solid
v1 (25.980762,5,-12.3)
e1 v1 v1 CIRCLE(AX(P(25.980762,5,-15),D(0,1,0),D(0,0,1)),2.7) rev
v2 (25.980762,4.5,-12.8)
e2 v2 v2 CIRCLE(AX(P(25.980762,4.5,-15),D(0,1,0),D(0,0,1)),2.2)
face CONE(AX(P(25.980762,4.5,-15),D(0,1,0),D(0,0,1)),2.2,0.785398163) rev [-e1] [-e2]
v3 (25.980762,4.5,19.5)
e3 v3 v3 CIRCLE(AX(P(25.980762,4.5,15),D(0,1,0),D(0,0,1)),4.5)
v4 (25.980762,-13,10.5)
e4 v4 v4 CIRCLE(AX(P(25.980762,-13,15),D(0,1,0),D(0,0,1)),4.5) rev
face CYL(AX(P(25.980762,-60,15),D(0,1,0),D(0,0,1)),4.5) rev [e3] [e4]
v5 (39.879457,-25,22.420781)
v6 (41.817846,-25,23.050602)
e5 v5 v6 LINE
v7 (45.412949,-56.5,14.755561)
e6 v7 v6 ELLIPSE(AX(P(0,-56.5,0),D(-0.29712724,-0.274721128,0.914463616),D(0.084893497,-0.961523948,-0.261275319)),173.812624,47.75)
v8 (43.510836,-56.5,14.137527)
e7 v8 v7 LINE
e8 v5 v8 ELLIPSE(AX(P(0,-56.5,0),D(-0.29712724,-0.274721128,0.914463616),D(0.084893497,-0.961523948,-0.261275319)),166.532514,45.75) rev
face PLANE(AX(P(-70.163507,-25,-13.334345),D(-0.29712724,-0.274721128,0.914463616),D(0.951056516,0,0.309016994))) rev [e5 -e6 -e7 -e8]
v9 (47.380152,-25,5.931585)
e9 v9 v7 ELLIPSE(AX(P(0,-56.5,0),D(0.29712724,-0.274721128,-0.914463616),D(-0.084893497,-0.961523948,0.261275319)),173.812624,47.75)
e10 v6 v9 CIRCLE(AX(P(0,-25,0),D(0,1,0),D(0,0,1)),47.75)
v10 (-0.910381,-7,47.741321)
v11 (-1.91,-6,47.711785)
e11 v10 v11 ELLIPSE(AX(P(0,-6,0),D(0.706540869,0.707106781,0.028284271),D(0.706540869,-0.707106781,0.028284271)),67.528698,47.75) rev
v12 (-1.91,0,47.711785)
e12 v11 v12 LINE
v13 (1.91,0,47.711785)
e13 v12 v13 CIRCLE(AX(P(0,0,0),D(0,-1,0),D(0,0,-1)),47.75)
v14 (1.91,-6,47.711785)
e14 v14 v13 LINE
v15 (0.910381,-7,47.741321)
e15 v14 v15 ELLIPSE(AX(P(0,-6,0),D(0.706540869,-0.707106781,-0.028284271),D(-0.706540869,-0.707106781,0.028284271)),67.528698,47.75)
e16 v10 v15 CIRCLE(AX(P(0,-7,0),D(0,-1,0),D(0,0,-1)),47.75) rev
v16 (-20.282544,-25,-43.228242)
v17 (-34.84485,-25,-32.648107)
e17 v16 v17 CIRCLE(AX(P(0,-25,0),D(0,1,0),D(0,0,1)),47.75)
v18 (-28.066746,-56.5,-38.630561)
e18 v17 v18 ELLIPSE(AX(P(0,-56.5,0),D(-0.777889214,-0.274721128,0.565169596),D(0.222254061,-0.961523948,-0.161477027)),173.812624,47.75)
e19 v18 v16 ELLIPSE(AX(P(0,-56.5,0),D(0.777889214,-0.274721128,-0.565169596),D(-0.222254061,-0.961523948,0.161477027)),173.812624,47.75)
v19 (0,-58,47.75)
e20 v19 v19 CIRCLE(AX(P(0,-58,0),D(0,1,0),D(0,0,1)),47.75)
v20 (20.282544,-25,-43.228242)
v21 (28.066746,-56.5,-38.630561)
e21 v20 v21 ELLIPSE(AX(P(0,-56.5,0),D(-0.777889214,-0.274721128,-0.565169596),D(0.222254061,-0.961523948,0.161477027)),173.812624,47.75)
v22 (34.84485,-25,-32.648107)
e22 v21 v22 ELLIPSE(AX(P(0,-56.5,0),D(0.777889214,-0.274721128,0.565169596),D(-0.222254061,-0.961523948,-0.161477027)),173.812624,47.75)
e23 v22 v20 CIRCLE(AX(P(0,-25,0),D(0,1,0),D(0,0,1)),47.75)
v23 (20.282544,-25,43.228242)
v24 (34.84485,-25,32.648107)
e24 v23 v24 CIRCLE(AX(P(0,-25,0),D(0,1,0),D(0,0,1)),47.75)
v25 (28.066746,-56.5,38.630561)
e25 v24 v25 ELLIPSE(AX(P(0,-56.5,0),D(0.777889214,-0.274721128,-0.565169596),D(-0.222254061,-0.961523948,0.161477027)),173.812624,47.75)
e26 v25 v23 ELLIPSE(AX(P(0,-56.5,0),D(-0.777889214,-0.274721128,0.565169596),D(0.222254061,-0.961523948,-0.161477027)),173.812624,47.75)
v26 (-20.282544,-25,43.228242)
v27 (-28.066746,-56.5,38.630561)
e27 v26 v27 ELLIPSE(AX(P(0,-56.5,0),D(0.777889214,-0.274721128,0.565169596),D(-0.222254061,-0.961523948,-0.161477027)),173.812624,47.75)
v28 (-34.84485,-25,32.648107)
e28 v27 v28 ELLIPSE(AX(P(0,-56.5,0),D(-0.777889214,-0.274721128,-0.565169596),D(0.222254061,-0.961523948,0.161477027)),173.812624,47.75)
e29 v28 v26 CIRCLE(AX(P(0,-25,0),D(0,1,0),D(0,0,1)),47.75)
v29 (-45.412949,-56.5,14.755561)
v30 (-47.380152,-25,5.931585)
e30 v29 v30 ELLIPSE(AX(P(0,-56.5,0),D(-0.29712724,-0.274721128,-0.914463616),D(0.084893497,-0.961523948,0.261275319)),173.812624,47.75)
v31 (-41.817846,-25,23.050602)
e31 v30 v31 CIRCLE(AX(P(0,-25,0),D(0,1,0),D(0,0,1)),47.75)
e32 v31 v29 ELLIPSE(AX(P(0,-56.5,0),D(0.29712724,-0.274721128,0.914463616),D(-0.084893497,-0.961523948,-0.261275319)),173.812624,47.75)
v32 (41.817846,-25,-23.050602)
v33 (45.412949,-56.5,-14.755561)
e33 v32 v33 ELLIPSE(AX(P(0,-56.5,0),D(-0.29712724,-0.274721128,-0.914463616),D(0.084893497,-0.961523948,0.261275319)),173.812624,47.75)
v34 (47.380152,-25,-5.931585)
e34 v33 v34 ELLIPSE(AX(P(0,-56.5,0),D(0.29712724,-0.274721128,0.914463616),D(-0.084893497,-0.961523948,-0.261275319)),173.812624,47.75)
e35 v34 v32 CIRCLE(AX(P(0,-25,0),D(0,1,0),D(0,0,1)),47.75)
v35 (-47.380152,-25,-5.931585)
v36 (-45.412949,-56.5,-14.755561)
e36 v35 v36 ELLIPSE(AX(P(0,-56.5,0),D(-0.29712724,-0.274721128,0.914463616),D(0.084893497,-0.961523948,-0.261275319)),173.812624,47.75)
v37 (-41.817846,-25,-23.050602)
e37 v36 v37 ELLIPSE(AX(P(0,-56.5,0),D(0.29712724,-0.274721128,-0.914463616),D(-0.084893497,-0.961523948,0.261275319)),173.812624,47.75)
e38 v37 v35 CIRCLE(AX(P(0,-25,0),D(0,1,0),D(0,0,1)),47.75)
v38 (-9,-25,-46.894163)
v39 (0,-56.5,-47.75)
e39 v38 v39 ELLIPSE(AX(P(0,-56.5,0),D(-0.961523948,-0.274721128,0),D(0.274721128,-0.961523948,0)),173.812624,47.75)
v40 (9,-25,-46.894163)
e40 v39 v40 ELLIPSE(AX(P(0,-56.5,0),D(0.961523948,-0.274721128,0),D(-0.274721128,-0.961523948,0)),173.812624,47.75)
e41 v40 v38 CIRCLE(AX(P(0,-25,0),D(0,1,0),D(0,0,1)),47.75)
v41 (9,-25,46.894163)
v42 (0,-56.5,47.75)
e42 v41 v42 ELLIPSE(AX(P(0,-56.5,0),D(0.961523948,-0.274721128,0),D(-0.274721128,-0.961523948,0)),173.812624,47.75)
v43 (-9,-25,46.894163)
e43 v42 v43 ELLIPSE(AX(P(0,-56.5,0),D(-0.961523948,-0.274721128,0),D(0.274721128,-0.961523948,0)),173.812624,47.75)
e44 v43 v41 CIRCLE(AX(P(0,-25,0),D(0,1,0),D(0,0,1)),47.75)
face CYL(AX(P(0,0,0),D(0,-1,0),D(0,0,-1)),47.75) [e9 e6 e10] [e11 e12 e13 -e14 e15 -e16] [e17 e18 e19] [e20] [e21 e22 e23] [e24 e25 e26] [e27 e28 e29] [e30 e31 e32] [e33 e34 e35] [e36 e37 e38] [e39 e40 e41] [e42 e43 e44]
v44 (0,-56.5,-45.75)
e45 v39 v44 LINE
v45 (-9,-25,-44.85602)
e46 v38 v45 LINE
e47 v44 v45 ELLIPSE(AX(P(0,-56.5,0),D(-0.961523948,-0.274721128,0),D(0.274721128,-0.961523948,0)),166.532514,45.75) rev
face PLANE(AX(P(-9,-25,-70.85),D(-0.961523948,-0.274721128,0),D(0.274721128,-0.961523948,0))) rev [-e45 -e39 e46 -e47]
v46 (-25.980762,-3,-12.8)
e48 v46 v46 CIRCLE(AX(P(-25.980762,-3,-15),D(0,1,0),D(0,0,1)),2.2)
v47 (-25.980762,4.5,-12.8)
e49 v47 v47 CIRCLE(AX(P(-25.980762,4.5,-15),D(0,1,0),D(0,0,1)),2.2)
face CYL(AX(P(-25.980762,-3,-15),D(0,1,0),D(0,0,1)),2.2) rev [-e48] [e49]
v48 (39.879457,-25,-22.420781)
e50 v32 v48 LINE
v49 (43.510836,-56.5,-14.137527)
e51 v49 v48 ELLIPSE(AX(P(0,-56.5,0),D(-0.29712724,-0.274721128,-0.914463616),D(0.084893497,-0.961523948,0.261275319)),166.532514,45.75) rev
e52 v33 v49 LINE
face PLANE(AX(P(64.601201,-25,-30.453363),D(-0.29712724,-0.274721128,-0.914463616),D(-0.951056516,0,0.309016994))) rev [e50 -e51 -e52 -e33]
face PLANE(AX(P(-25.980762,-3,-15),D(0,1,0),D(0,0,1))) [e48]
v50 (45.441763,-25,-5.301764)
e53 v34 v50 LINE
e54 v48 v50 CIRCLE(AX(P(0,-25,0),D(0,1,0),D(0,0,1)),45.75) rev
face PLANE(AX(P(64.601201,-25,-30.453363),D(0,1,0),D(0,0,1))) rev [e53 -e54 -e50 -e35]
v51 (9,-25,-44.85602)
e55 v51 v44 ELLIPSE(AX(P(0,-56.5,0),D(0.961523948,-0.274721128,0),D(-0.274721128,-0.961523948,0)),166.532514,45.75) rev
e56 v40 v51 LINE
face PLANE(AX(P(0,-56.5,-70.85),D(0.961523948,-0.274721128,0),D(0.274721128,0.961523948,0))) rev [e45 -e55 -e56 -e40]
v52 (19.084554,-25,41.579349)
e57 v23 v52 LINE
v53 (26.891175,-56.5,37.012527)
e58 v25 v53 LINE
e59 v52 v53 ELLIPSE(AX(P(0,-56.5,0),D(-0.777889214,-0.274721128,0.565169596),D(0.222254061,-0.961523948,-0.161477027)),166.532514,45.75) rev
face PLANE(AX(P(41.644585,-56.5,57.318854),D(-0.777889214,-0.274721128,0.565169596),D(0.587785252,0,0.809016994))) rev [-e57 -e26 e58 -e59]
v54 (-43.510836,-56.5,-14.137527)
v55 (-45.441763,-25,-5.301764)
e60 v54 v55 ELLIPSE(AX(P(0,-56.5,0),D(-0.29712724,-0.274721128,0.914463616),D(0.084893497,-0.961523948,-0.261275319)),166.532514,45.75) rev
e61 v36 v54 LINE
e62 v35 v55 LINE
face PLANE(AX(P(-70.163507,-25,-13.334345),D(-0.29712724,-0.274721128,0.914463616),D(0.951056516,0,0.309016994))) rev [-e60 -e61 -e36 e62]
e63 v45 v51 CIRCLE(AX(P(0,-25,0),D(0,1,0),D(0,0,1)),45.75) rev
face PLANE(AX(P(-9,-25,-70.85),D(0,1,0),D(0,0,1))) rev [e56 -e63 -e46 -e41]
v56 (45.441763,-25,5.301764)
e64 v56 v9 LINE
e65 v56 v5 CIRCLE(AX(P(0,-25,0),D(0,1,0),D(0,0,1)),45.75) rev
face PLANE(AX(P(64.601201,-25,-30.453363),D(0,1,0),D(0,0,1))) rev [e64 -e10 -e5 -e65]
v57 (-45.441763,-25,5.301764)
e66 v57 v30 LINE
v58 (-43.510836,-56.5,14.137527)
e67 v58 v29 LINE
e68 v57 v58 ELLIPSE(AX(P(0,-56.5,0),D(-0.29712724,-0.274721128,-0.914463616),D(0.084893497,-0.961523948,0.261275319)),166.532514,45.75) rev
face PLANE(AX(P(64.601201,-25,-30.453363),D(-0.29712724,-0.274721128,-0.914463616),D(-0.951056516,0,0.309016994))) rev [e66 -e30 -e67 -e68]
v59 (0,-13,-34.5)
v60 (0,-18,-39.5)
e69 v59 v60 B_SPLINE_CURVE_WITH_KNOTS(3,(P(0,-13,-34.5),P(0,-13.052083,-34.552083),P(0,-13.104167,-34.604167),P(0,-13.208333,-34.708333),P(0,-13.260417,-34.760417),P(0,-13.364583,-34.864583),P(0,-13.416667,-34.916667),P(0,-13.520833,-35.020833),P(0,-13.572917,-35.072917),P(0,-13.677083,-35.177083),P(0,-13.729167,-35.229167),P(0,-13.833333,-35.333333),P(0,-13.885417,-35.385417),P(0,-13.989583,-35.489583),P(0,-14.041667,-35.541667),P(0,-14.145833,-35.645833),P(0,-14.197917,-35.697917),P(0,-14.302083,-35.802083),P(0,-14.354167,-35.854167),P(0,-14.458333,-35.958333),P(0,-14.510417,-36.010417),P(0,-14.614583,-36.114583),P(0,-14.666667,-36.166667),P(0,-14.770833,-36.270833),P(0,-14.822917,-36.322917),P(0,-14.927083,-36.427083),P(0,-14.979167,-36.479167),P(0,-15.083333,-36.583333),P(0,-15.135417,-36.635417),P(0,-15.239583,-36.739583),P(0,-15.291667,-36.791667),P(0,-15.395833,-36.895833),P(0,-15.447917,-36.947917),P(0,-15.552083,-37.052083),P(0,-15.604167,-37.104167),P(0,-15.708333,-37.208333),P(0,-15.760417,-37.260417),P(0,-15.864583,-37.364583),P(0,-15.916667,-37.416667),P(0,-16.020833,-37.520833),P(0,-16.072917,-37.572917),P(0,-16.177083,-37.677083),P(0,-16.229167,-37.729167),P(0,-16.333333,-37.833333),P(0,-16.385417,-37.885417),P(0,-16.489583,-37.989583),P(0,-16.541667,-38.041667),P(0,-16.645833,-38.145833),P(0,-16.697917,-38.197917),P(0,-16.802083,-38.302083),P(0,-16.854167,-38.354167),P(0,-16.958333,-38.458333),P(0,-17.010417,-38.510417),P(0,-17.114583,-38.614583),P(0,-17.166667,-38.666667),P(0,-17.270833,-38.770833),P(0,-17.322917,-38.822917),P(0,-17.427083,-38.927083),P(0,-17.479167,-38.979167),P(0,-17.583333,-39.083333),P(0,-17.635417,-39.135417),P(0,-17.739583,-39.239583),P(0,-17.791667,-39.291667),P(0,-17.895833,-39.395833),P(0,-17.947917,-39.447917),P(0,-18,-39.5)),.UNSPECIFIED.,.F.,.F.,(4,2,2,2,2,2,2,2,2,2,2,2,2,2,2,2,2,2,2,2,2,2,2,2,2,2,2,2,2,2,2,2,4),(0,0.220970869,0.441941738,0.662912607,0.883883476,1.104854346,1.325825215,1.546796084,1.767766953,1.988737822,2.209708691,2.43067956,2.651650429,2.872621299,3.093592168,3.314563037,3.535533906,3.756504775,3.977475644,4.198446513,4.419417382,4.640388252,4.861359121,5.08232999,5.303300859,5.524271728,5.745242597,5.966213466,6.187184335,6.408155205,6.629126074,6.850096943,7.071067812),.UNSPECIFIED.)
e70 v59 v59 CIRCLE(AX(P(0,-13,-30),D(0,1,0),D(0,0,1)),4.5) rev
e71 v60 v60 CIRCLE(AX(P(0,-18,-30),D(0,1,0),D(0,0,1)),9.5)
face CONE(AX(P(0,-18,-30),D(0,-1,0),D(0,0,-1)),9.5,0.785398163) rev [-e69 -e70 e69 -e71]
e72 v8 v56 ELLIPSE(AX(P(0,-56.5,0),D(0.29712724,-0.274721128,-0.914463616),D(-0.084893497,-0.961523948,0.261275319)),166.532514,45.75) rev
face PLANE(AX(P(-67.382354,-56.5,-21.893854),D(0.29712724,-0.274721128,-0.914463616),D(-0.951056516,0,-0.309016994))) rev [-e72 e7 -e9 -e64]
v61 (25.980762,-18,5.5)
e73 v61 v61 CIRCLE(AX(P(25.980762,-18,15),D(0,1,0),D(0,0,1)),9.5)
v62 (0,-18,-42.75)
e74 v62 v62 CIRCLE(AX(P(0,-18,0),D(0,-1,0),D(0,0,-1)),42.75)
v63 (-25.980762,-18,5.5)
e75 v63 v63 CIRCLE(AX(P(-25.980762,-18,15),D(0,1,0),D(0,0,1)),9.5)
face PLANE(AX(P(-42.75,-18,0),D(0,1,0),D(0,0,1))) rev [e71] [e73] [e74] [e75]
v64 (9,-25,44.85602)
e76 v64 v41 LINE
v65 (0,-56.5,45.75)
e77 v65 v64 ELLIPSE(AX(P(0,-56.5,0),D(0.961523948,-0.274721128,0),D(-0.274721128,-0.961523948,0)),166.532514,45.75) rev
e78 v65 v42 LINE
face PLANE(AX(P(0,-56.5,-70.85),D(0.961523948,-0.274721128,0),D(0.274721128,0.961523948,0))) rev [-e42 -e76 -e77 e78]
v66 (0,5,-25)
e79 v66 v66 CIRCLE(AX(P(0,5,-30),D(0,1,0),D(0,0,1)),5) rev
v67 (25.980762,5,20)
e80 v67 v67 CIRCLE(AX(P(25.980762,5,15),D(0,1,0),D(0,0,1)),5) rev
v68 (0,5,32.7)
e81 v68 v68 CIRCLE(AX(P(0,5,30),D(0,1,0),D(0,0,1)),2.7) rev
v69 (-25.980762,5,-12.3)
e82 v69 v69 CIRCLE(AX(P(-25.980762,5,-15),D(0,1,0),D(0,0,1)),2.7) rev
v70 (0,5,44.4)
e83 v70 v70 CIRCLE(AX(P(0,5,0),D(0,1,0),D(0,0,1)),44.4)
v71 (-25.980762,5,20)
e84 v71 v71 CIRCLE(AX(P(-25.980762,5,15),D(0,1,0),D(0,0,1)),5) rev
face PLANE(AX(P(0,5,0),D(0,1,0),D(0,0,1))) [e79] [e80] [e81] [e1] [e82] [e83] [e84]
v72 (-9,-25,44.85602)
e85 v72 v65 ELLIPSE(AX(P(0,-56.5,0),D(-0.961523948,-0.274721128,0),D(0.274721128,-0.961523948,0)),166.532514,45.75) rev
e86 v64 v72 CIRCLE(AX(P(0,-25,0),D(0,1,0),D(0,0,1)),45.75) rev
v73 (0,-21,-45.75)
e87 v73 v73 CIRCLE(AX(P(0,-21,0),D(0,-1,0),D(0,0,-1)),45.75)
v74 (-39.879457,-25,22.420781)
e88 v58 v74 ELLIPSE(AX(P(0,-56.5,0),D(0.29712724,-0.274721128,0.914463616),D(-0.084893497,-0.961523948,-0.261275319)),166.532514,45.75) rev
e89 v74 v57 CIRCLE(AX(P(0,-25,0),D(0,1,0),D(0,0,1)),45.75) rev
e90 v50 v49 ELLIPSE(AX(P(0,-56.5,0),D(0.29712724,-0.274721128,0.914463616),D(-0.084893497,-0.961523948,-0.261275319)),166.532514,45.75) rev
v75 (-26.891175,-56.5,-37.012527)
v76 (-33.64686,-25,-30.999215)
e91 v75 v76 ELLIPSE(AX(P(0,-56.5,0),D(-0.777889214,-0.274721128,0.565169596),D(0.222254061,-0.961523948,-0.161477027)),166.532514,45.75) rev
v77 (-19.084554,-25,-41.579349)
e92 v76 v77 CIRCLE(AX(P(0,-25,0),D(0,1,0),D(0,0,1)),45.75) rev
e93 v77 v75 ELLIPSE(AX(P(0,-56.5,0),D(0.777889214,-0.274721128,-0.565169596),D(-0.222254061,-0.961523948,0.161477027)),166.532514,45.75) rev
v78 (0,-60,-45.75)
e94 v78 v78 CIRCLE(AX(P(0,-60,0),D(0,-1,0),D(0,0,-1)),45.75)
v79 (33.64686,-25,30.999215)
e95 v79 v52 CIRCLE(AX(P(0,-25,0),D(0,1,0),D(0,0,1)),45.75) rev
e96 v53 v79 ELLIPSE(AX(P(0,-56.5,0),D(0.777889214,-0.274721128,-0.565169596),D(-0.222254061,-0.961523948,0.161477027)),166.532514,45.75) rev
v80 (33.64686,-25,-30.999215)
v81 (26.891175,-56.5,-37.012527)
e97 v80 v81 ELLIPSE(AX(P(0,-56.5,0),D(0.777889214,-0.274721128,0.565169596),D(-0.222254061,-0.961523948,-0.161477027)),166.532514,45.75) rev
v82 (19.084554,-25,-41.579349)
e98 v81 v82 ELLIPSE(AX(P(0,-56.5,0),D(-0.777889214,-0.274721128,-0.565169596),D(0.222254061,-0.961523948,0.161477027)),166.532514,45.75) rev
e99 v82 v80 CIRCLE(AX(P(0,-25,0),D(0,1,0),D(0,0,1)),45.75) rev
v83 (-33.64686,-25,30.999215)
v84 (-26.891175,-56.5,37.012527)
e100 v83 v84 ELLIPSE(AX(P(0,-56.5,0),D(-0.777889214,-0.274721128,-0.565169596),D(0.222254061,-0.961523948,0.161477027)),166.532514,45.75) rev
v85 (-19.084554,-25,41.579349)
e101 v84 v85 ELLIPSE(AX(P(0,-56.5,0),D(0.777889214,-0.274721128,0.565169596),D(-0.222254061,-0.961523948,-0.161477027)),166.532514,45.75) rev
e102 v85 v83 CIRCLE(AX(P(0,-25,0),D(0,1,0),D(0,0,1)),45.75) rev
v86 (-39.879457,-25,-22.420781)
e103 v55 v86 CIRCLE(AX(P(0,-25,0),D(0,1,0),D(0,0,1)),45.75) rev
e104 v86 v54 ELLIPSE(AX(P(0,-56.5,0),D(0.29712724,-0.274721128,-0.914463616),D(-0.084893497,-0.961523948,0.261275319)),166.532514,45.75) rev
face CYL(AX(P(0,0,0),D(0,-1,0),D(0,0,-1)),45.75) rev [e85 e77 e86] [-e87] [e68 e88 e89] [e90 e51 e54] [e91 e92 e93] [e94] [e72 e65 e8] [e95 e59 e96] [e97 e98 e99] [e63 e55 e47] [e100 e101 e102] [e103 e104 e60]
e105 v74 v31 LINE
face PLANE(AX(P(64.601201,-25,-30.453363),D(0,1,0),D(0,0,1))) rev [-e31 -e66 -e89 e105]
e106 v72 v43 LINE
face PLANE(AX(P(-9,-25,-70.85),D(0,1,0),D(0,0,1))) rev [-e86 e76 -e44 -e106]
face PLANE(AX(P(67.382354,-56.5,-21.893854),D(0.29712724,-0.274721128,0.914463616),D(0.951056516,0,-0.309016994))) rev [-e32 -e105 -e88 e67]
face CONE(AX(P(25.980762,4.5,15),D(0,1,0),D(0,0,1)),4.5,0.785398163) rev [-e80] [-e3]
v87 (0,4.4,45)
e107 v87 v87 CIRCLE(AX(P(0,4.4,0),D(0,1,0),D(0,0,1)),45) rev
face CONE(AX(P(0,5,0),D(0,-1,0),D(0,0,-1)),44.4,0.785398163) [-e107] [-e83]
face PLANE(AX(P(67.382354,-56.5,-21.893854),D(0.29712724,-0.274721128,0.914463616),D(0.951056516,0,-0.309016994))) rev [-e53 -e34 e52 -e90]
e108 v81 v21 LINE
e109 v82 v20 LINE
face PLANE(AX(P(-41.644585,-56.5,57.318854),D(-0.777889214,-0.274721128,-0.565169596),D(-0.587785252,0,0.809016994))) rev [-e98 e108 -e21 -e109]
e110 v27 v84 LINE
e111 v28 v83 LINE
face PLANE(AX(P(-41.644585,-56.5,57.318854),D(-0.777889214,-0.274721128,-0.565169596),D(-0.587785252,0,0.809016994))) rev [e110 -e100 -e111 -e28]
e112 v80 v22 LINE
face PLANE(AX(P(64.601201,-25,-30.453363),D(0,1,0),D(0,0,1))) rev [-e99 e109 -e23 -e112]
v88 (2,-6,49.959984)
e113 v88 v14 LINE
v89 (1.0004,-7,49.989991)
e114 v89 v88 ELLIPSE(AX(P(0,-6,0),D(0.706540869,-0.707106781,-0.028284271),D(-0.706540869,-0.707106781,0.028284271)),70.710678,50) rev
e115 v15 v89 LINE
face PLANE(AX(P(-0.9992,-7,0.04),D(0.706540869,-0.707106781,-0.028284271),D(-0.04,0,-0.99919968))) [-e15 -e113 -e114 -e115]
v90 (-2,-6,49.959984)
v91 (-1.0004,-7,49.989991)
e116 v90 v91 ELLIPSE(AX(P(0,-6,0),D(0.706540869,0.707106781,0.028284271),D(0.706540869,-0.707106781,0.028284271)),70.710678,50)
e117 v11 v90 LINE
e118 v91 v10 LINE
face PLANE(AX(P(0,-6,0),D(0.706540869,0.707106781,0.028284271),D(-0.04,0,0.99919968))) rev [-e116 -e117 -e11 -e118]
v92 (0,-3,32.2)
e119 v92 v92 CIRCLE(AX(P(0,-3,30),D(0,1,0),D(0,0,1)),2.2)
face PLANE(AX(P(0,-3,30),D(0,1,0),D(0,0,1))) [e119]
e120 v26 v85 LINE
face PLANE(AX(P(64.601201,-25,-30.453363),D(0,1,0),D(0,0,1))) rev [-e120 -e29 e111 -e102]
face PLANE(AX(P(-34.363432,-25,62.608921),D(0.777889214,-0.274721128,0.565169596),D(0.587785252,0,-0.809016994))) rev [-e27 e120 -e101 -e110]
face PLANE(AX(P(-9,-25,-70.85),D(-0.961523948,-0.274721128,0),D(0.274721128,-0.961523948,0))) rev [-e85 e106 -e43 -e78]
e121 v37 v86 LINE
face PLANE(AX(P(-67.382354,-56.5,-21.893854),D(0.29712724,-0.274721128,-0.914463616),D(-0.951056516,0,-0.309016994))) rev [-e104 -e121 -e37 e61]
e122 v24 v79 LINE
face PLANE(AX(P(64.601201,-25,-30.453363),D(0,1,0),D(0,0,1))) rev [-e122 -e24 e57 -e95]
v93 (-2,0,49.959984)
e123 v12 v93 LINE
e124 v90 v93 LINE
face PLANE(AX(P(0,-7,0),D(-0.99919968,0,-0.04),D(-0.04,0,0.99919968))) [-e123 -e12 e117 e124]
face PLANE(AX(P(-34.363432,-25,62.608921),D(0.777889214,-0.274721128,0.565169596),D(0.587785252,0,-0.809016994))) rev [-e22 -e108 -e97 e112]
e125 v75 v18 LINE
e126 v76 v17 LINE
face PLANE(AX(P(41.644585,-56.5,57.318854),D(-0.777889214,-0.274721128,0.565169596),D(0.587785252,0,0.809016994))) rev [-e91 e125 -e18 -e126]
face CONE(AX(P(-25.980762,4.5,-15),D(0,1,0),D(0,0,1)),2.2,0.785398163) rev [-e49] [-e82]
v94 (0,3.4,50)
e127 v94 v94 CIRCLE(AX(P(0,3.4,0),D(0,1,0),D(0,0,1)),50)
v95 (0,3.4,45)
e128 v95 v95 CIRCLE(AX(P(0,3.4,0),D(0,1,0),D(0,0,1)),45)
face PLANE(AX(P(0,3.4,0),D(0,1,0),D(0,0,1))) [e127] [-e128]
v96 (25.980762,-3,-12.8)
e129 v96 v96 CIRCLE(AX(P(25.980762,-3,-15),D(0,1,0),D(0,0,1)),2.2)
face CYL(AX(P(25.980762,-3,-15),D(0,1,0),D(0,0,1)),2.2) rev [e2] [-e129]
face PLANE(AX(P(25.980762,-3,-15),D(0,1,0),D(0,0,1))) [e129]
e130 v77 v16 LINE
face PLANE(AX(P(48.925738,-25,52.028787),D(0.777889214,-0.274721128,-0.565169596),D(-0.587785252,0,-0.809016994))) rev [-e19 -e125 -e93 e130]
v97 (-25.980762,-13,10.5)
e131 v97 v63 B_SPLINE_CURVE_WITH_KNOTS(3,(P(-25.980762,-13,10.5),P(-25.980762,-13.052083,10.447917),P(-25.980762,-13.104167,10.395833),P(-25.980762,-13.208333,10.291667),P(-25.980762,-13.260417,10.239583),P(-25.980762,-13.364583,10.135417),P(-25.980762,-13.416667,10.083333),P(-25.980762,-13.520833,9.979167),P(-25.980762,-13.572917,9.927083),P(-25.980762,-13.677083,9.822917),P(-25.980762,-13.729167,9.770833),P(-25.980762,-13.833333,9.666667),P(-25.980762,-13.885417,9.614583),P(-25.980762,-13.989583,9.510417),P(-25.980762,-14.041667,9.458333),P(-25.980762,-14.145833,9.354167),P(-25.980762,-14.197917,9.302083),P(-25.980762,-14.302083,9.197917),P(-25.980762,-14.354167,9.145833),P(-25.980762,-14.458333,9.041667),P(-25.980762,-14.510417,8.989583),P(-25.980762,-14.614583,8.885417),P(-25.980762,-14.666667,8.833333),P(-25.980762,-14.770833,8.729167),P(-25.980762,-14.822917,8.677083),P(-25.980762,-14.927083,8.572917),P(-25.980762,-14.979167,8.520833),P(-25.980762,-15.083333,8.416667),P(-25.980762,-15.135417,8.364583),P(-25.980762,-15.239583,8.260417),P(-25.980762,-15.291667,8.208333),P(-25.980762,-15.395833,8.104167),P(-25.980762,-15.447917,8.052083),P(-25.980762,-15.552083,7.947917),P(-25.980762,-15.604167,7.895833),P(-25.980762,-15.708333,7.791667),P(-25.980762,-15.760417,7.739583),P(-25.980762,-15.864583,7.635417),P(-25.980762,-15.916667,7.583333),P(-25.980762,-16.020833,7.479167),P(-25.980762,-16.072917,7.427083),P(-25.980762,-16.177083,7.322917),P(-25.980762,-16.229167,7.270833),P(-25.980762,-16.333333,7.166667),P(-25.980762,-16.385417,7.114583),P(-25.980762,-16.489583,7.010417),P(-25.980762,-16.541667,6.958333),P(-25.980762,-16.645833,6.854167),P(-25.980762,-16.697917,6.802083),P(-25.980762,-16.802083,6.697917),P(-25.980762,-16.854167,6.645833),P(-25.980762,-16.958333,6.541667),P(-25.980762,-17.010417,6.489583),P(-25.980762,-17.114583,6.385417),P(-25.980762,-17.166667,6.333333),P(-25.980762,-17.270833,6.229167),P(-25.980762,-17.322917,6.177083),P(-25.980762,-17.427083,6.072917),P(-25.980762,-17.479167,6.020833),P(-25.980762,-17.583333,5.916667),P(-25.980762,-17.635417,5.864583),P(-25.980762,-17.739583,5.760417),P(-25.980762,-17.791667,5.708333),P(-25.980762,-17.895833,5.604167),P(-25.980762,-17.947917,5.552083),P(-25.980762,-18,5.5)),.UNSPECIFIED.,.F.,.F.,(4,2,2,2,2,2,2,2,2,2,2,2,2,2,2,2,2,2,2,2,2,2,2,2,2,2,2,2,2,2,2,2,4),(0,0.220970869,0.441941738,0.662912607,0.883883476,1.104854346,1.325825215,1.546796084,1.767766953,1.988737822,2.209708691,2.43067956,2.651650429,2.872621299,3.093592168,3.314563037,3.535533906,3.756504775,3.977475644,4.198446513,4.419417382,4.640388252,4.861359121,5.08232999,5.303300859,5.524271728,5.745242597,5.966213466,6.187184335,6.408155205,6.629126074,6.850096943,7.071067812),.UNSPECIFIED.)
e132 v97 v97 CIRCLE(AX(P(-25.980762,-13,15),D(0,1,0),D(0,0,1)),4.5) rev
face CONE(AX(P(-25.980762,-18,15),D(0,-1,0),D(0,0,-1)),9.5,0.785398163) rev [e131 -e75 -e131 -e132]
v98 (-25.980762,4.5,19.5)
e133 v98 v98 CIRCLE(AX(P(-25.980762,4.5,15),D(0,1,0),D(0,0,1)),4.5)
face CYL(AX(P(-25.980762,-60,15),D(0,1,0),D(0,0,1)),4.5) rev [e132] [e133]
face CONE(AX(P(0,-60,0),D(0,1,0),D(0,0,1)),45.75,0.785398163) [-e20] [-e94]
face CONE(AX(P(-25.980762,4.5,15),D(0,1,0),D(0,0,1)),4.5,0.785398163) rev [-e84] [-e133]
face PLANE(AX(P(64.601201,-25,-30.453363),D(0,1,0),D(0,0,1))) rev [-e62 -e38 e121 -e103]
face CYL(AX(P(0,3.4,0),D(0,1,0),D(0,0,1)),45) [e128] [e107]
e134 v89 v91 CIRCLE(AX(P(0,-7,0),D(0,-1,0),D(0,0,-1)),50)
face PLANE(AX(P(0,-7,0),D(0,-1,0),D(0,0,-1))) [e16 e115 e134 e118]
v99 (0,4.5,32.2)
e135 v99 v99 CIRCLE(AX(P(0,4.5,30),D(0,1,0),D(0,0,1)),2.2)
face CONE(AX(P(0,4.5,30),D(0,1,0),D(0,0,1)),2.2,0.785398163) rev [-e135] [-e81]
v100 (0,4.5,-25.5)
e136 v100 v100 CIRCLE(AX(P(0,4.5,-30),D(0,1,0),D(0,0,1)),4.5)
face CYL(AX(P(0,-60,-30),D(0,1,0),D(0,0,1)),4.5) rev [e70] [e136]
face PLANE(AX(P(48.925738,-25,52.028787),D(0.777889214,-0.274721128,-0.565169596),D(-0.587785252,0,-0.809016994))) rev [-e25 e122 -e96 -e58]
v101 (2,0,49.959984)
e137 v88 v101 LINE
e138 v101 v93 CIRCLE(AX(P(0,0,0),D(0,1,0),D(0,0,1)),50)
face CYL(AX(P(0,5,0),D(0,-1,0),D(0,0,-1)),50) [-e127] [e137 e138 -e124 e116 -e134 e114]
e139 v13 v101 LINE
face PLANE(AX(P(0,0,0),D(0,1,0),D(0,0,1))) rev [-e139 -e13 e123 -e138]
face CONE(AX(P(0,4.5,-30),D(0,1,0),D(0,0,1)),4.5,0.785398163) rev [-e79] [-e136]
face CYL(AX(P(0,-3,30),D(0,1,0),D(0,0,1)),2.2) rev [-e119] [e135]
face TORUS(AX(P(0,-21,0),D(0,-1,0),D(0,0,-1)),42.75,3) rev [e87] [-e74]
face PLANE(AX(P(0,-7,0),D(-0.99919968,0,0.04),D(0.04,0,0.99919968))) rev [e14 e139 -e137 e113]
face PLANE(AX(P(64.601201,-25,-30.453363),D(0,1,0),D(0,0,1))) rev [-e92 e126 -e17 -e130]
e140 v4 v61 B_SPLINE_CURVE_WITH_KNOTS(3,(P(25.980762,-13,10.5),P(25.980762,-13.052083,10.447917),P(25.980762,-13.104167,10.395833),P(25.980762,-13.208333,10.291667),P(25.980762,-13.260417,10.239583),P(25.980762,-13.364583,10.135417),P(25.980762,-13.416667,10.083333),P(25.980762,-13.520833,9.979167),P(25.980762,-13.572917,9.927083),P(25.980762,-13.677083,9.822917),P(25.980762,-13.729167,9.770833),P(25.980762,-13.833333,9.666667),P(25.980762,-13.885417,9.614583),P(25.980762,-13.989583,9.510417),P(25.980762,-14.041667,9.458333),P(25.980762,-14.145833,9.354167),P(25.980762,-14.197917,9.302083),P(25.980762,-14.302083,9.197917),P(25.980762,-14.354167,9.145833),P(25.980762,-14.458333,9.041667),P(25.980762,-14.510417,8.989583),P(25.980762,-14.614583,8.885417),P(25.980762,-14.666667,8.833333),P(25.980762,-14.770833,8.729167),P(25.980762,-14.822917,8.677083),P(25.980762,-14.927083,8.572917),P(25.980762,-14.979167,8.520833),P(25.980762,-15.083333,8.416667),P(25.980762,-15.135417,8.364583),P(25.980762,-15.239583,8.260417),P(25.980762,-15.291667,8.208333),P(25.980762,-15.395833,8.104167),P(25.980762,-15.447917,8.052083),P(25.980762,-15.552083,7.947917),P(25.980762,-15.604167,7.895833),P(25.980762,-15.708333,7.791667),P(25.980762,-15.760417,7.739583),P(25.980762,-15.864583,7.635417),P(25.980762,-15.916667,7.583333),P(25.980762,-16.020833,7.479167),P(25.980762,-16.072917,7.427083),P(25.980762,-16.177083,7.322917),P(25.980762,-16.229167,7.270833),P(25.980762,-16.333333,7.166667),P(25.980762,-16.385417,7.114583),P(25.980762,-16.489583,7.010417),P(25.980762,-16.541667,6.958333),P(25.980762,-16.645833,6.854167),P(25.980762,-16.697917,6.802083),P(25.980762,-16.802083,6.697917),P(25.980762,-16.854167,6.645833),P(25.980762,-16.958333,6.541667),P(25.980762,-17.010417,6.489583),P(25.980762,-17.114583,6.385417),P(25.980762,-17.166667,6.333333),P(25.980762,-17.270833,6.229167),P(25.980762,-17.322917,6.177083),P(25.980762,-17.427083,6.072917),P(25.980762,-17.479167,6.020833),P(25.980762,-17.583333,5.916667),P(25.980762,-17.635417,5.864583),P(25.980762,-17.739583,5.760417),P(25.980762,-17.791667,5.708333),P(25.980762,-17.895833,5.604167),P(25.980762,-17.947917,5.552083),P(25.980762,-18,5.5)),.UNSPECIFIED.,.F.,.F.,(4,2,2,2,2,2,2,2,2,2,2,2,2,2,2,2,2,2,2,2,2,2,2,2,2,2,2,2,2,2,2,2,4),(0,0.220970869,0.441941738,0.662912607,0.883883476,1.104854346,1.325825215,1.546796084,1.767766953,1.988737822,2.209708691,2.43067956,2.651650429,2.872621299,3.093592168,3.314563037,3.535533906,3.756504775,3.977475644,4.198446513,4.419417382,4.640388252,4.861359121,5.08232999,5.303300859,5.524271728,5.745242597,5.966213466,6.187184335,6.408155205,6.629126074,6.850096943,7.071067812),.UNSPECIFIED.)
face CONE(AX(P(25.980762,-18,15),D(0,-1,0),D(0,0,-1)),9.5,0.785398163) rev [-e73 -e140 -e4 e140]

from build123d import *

# Parameters (mm, degrees)
CUT_EXTRUDE_651_DEPTH      = 70.85
PATTERN_CIRCULAR_705_COUNT = 5
SKETCH_7_R                 = 50
EXTRUDE_1_DEPTH            = 5
CUT_EXTRUDE_START          = -1.6
SKETCH_8_R                 = 50
SKETCH_8_R_2               = 45
CUT_EXTRUDE_1_DEPTH        = 1.6
SKETCH_10_R                = 4.5
CUT_EXTRUDE_4_DEPTH        = 97.046863561
SKETCH_10_4_R              = 2.2
CUT_EXTRUDE_5_DEPTH        = 8
CHAMFER_1_SIZE             = 0.5
EXTRUDE_START              = 7
EXTRUDE_2_DEPTH            = 7
CHAMFER_4_SIZE             = 1
CHAMFER_5_SIZE             = 2
CHAMFER_6_SIZE             = 5
CHAMFER_7_SIZE             = 0.6


with BuildPart() as part:
    # Эскиз2 → Revolve 379 (revolve)
    with BuildSketch(Plane.XY, mode=Mode.PRIVATE) as revolve_379_sk:
        with BuildLine():
            Line((0, 0), (-47.75, 0))
            Line((-47.75, 0), (-47.75, -60))
            Line((-47.75, -60), (-45.75, -60))
            Line((-45.75, -60), (-45.75, -21))
            ThreePointArc((-45.75, -21), (-44.871320344, -18.878679656), (-42.75, -18))
            Line((-42.75, -18), (0, -18))
            Line((0, -18), (0, 0))
        make_face()
    revolve(revolve_379_sk.sketch.rotate(Axis((0, 0, 0), (0, 1, 0)), 270), axis=Axis((0, 0, 0), (0, 1, 0)))

    # Эскиз4 → Cut-Extrude 651 (cut, symmetric)
    with BuildSketch(Plane.XY):
        Polygon((-9, -25), (9, -25), (0, -56.5), align=None)
    cut_extrude_651 = extrude(amount=CUT_EXTRUDE_651_DEPTH, both=True, mode=Mode.SUBTRACT)

    # Pattern Circular 705: Cut-Extrude 651 ×5 about axis
    pattern_circular_705_axis = Axis((0, 0, 0), (0, 1, 0))
    for i in range(1, PATTERN_CIRCULAR_705_COUNT):
        add(cut_extrude_651.rotate(pattern_circular_705_axis, i * 360 / PATTERN_CIRCULAR_705_COUNT), mode=Mode.SUBTRACT)

    # Эскиз7 → Бобышка-Вытянуть1 (add)
    with BuildSketch(Plane(origin=(0, 0, 0), x_dir=(1, 0, 0), z_dir=(0, 1, 0))):
        with Locations(Location((0, 0, 0), (0, 0, 270))):
            Circle(SKETCH_7_R)
    extrude(amount=EXTRUDE_1_DEPTH)

    # Эскиз8 → Вырез-Вытянуть1 (cut)
    with BuildSketch(Plane(origin=(0, 5, 0), x_dir=(1, 0, 0), z_dir=(0, 1, 0)).offset(CUT_EXTRUDE_START)):
        with Locations(Location((0, 0, 0), (0, 0, 270))):
            Circle(SKETCH_8_R)
        with Locations(Location((0, 0, 0), (0, 0, 270))):
            Circle(SKETCH_8_R_2, mode=Mode.SUBTRACT)
    extrude(amount=CUT_EXTRUDE_1_DEPTH, mode=Mode.SUBTRACT)

    # Эскиз10 → Вырез-Вытянуть4 (cut, through all)
    with BuildSketch(Plane(origin=(0, 5, 0), x_dir=(1, 0, 0), z_dir=(0, 1, 0))):
        with Locations(Location((0, 30, 0), (0, 0, 270))):
            Circle(SKETCH_10_R)
        with Locations(Location((25.980762114, -15, 0), (0, 0, 270))):
            Circle(SKETCH_10_R)
        with Locations(Location((-25.980762114, -15, 0), (0, 0, 270))):
            Circle(SKETCH_10_R)
    extrude(amount=-CUT_EXTRUDE_4_DEPTH, mode=Mode.SUBTRACT)

    # Эскиз10<4> → Вырез-Вытянуть5 (cut)
    with BuildSketch(Plane(origin=(0, 5, 0), x_dir=(1, 0, 0), z_dir=(0, 1, 0))):
        with Locations(Location((0, -30, 0), (0, 0, 270))):
            Circle(SKETCH_10_4_R)
        with Locations(Location((-25.980762114, 15, 0), (0, 0, 270))):
            Circle(SKETCH_10_4_R)
        with Locations(Location((25.980762114, 15, 0), (0, 0, 270))):
            Circle(SKETCH_10_4_R)
    extrude(amount=-CUT_EXTRUDE_5_DEPTH, mode=Mode.SUBTRACT)

    # Фаска1
    chamfer_1_edges = [part.edges().sort_by_distance(p)[0] for p in [
        (0, 5, -34.5),
        (-25.980762114, 5, 10.5),
        (25.980762114, 5, 10.5),
        (-25.980762114, 5, -17.2),
        (25.980762114, 5, -17.2),
        (0, 5, 27.8),
    ]]
    chamfer(chamfer_1_edges, length=CHAMFER_1_SIZE)

    # Эскиз13 → Бобышка-Вытянуть2 (add)
    with BuildSketch(Plane.XZ.offset(EXTRUDE_START)):
        with BuildLine():
            ThreePointArc((-1.91, 47.711784708), (0, 47.75), (1.91, 47.711784708))
            Line((1.91, 47.711784708), (2, 49.959983987))
            ThreePointArc((2, 49.959983987), (0, 50), (-2, 49.959983987))
            Line((-2, 49.959983987), (-1.91, 47.711784708))
        make_face()
    extrude(amount=-EXTRUDE_2_DEPTH)

    # Фаска4
    chamfer_4_edges = [part.edges().sort_by_distance(p)[0] for p in [
        (-1.955, -7, 48.835884347),
        (1.955, -7, 48.835884347),
    ]]
    chamfer(chamfer_4_edges, length=CHAMFER_4_SIZE)

    # Фаска5
    chamfer_5_edges = [part.edges().sort_by_distance(p)[0] for p in [
        (0, -60, 47.75),
    ]]
    chamfer(chamfer_5_edges, length=CHAMFER_5_SIZE - 0.0001)  # a hair under: the kernel refuses the full size

    # Фаска6
    chamfer_6_edges = [part.edges().sort_by_distance(p)[0] for p in [
        (0, -18, -34.5),
        (-25.980762114, -18, 10.5),
        (25.980762114, -18, 10.5),
    ]]
    chamfer(chamfer_6_edges, length=CHAMFER_6_SIZE)

    # Фаска7
    chamfer_7_edges = [part.edges().sort_by_distance(p)[0] for p in [
        (0, 5, -45),
    ]]
    chamfer(chamfer_7_edges, length=CHAMFER_7_SIZE)


solid = part.part
